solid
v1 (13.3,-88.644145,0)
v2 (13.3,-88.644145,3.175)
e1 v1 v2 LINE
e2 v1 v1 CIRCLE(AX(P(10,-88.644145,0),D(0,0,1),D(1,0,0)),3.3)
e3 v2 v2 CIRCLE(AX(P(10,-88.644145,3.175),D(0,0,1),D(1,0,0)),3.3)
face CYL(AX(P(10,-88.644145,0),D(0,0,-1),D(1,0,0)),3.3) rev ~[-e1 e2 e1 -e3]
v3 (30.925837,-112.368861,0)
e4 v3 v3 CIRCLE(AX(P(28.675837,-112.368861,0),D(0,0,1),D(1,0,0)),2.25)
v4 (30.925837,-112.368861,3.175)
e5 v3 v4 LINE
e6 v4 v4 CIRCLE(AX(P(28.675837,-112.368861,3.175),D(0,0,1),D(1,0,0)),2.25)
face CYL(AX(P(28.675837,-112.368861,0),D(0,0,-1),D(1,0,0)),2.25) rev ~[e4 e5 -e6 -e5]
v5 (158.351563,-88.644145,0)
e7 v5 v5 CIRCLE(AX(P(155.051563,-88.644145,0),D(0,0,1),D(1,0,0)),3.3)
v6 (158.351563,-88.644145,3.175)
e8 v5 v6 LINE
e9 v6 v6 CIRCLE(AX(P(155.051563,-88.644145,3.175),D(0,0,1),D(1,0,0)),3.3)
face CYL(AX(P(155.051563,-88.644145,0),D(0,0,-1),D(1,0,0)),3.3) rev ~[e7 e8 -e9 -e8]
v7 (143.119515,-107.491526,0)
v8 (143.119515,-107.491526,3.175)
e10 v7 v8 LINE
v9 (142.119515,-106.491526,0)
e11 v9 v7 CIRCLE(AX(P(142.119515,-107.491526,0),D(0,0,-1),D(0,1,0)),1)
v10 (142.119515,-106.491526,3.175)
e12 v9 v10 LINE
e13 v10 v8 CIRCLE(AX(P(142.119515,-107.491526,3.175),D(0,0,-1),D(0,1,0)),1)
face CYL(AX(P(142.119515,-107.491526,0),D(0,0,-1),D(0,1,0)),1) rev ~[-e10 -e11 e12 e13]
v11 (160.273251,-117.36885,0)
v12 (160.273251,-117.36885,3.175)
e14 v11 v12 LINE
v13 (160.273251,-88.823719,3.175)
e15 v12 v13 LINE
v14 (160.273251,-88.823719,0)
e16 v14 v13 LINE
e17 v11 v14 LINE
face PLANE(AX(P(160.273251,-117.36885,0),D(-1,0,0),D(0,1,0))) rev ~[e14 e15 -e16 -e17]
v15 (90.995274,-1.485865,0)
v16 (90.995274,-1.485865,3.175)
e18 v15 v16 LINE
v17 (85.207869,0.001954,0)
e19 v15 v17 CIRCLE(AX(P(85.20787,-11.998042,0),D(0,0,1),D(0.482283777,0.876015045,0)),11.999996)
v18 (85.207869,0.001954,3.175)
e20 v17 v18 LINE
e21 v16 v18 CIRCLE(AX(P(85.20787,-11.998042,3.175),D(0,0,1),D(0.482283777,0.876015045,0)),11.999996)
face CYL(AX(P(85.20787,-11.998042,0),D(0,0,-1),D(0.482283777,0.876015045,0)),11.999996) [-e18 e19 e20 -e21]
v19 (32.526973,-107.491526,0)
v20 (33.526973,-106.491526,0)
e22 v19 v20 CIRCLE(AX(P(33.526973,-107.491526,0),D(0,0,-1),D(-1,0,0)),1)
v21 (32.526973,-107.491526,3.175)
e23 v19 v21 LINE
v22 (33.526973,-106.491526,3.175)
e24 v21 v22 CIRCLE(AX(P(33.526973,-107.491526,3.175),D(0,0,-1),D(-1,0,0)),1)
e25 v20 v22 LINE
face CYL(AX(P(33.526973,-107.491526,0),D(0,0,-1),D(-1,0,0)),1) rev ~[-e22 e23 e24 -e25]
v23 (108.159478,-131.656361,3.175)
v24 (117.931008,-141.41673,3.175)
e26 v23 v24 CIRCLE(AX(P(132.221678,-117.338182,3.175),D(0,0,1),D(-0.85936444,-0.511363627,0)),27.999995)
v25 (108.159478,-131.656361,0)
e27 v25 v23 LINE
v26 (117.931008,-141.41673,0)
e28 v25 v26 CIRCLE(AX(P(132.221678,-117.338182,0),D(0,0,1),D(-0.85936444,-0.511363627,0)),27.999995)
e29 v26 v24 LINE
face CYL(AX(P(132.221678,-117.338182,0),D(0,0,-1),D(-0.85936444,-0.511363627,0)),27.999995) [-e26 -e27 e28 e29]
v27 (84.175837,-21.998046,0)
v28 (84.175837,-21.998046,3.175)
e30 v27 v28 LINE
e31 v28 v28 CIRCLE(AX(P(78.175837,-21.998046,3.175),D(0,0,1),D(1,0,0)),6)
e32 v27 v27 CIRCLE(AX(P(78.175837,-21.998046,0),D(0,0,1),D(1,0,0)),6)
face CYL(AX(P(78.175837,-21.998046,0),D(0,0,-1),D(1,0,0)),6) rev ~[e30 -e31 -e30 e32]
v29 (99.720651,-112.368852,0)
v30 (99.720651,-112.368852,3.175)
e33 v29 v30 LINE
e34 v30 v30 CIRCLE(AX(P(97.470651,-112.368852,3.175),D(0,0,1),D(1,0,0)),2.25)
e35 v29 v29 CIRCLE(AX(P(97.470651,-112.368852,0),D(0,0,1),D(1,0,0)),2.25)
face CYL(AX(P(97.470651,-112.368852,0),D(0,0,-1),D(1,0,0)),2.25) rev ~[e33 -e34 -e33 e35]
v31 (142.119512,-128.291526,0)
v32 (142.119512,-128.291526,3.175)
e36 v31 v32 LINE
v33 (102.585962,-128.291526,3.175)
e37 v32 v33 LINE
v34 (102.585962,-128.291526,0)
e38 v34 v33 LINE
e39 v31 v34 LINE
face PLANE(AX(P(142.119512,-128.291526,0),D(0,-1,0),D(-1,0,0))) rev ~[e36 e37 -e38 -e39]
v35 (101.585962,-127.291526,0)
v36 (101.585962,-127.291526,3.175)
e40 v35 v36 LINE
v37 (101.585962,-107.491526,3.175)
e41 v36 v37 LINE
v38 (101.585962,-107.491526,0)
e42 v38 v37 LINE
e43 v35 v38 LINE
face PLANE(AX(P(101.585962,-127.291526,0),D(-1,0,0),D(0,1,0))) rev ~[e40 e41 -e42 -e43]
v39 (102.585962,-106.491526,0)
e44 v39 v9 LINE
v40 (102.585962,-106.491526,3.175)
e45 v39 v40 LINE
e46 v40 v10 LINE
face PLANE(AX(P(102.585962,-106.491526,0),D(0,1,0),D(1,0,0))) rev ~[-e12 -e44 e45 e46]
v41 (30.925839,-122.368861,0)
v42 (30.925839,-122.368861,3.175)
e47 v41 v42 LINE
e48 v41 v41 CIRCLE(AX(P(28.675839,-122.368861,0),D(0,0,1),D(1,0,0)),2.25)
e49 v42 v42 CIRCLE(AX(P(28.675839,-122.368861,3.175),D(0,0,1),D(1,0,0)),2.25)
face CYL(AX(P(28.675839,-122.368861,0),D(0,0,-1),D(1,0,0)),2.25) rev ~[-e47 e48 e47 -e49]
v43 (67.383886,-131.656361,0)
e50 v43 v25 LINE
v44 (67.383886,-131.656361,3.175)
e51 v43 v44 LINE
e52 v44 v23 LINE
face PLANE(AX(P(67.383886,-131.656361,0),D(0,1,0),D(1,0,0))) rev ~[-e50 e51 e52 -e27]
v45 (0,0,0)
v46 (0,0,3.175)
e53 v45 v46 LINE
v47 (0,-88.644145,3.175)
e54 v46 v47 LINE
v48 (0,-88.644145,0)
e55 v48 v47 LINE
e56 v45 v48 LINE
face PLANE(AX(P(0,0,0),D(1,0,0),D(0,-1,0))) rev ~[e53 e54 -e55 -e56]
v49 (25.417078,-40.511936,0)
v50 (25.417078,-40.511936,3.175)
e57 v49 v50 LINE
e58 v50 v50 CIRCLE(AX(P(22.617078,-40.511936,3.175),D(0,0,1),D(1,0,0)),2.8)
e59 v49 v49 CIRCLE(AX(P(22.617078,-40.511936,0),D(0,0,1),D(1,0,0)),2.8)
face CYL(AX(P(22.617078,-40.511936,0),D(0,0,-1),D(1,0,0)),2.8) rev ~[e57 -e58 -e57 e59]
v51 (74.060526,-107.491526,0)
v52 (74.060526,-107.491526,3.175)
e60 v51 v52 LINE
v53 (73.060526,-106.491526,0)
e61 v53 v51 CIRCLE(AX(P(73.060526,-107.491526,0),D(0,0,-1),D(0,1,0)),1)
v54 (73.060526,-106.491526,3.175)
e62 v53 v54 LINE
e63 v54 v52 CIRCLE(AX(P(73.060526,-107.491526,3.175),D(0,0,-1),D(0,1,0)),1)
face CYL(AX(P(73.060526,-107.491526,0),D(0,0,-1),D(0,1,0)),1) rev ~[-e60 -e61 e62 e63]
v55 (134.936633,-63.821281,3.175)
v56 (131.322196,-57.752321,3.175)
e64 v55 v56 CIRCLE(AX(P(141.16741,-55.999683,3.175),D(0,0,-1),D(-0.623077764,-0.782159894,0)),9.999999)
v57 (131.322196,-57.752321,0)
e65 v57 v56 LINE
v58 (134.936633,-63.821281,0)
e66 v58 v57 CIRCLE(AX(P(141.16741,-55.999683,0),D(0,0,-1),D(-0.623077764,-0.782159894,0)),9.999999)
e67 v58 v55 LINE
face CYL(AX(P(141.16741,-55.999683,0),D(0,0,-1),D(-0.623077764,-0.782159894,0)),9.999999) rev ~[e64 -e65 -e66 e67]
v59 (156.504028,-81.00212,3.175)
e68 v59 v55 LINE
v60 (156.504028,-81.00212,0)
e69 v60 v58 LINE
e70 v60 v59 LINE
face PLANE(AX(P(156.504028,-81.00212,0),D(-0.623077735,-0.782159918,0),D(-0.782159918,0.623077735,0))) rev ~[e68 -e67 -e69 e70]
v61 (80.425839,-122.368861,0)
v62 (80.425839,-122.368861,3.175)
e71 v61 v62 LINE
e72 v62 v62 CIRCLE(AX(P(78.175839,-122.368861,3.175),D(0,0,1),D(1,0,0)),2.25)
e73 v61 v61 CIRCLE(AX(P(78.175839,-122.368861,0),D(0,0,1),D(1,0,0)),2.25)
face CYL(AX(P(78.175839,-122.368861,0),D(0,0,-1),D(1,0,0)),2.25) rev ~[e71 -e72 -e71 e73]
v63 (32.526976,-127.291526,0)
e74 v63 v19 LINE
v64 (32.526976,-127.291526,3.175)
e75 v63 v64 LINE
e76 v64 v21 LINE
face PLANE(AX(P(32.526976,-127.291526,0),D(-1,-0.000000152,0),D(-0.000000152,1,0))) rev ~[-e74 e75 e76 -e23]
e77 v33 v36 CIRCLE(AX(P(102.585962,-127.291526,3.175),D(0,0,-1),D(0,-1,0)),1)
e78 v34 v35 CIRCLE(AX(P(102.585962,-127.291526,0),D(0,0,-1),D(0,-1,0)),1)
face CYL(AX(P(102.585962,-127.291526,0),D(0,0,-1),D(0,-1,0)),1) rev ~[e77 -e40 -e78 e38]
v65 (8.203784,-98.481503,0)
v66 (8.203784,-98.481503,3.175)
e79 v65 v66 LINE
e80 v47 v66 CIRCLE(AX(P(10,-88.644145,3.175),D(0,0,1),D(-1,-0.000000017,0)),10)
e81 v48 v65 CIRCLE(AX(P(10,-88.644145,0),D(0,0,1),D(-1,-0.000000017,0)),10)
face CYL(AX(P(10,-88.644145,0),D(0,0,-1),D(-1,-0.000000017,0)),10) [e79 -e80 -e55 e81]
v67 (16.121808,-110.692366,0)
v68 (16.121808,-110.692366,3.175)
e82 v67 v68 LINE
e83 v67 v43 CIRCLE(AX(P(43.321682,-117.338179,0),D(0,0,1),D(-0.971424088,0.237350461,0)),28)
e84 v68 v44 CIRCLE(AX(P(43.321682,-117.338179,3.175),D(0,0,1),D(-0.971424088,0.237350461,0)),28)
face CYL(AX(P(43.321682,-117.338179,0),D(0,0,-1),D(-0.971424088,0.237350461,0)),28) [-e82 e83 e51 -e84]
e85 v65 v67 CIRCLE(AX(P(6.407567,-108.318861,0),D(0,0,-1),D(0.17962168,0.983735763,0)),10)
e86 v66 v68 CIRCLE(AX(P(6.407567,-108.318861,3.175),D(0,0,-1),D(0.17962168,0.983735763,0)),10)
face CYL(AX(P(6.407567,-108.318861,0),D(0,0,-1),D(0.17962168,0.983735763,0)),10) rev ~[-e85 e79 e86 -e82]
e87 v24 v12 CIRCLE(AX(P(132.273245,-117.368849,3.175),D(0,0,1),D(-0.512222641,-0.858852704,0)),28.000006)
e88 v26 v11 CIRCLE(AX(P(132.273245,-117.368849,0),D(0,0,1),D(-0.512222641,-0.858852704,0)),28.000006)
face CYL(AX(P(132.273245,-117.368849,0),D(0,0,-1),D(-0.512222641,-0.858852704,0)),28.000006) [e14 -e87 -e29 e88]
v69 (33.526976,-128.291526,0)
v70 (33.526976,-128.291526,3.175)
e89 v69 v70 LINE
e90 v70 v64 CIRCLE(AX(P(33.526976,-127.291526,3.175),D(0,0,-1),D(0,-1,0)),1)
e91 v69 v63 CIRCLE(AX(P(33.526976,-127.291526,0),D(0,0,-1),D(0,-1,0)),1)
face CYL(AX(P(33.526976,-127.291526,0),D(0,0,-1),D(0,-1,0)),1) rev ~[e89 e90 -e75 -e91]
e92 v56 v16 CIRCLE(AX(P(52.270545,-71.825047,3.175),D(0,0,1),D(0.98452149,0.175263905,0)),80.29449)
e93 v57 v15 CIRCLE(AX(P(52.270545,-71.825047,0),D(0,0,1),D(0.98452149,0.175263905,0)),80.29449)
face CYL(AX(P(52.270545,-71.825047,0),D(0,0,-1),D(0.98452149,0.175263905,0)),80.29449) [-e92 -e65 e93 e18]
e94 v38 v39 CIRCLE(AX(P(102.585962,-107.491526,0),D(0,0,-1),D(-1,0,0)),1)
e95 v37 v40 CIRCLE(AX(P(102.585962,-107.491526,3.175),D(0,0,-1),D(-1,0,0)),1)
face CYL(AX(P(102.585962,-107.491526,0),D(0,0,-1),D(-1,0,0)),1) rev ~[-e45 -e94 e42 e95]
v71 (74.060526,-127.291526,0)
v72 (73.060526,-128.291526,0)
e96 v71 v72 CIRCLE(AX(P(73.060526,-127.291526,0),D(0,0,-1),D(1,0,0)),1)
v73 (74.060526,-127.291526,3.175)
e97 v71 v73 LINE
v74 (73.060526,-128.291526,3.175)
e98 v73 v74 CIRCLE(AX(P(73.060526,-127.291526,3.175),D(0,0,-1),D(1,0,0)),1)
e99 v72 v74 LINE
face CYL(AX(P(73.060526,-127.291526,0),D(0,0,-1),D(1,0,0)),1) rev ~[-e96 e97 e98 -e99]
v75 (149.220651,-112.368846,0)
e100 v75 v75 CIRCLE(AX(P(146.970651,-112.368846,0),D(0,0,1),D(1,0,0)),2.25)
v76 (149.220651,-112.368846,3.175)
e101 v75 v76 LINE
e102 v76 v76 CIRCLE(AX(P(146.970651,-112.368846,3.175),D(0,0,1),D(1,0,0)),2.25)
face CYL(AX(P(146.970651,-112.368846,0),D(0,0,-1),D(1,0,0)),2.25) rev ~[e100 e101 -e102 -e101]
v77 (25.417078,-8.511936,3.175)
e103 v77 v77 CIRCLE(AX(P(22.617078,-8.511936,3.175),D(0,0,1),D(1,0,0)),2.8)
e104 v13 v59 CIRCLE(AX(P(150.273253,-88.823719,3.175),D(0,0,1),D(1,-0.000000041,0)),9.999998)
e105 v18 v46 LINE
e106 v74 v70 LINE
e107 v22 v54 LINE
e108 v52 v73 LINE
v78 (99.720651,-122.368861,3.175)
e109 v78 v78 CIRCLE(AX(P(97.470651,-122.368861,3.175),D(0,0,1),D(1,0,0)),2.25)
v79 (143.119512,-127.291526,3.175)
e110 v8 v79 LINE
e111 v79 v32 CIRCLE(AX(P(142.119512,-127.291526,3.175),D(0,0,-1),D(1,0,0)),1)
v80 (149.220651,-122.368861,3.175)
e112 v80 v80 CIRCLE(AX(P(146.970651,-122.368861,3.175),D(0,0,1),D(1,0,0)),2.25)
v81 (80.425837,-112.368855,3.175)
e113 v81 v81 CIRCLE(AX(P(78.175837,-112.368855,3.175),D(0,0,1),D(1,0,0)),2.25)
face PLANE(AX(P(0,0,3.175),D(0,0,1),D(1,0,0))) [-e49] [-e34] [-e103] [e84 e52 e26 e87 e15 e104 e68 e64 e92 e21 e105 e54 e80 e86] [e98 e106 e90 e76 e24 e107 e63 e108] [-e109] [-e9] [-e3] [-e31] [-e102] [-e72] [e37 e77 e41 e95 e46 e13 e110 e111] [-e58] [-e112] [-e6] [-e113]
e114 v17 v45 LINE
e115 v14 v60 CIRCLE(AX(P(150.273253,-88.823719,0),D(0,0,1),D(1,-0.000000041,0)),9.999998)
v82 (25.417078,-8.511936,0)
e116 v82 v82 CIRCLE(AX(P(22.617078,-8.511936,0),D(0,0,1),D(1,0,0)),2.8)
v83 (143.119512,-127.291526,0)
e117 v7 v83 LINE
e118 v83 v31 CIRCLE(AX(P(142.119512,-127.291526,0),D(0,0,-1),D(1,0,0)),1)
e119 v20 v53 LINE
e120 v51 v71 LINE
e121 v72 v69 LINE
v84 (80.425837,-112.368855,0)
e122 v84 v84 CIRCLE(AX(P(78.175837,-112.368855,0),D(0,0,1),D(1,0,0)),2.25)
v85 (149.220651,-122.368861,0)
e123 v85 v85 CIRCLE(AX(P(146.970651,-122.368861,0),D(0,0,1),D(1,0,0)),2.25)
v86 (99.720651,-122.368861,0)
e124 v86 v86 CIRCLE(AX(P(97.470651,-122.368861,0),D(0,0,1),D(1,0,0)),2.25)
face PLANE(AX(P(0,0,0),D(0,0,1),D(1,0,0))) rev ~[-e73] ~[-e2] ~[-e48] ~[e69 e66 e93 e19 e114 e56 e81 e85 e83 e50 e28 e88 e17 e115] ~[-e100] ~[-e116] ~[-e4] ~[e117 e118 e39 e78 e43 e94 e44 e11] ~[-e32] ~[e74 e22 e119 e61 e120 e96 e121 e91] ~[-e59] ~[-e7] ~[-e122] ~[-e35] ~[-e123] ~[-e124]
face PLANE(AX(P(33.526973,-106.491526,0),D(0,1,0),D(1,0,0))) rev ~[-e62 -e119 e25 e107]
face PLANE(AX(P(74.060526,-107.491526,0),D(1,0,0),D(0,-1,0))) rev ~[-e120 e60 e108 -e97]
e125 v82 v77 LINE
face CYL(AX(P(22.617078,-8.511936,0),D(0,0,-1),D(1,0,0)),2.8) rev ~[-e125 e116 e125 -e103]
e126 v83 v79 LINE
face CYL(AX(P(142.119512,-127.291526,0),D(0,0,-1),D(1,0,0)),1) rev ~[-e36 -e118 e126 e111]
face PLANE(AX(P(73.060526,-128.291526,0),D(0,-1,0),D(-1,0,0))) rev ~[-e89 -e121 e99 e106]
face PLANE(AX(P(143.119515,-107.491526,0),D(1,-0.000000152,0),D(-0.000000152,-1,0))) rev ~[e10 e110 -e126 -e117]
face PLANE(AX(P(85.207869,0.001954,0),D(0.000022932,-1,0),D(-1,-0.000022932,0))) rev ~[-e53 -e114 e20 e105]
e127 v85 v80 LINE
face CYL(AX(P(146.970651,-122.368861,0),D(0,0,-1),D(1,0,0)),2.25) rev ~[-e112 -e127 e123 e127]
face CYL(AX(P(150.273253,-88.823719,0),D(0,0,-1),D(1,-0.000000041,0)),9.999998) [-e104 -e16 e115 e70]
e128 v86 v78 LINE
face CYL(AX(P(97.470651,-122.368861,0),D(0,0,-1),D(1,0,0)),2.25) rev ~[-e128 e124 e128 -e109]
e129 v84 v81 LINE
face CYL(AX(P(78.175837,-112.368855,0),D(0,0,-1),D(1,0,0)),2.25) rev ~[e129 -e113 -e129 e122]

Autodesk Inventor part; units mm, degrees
ref_plane "YZ Plane" through (0, 0, 0) normal (1, 0, 0) x (0, 1, 0)
ref_plane "XZ Plane" through (0, 0, 0) normal (0, 1, 0) x (-1, 0, 0)
ref_plane "XY Plane" through (0, 0, 0) normal (0, 0, 1) x (1, 0, 0)
sketch "Sketch1" plane through (0, 0, 0) normal (0, 0, 1) x (1, 0, 0)
  arc A0 (16.121808, -110.692366) -> (67.383886, -131.656361) centre (43.321682, -117.338179) ccw
  line L0 (67.383886, -131.656361) -> (108.159478, -131.656361)
  arc A1 (108.159478, -131.656361) -> (139.594615, -90.326332) centre (132.221682, -117.338179) ccw
  arc A2 (132.227805, -80.679244) -> (139.594615, -90.326332) centre (142.227805, -80.679244) ccw
  line L1 (132.227805, -80.679244) -> (132.227805, -71.827)
  arc A3 (132.227805, -71.827) -> (90.658044, -1.487819) centre (51.933317, -71.827) ccw
  arc A4 (90.658044, -1.487819) -> (84.870639, 0) centre (84.870639, -12) ccw
  line L2 (84.870639, 0) -> (0, 0)
  line L3 (0, 0) -> (0, -88.644145)
  arc A5 (0, -88.644145) -> (8.203784, -98.481503) centre (10, -88.644145) ccw
  arc A6 (16.121808, -110.692366) -> (8.203784, -98.481503) centre (6.407567, -108.318861) ccw
  circle A7 centre (121.188208, -82.443861) radius 3.3
  arc A8 (145.794404, -114.286904) -> (148.095336, -110.420107) centre (146.970651, -112.368846) ccw
  circle A9 centre (97.470651, -122.368861) radius 2.25
  circle A10 centre (97.470651, -112.368852) radius 2.25
  circle A11 centre (78.175839, -122.368861) radius 2.25
  arc A12 (145.794404, -124.286918) -> (148.095336, -120.420122) centre (146.970651, -122.368861) ccw
  circle A13 centre (22.617078, -8.511936) radius 2.8
  circle A14 centre (22.617078, -40.511936) radius 2.8
  circle A15 centre (28.675839, -122.368861) radius 2.25
  circle A16 centre (28.675837, -112.368861) radius 2.25
  circle A17 centre (78.175837, -112.368855) radius 2.25
  circle A18 centre (10, -88.644145) radius 3.3
  line L4 (73.060526, -128.291526) -> (33.526976, -128.291526)
  arc A19 (32.526976, -127.291526) -> (33.526976, -128.291526) centre (33.526976, -127.291526) ccw
  line L5 (32.526976, -127.291526) -> (32.526973, -107.491526)
  arc A20 (33.526973, -106.491526) -> (32.526973, -107.491526) centre (33.526973, -107.491526) ccw
  line L6 (33.526973, -106.491526) -> (73.060526, -106.491526)
  arc A21 (74.060526, -107.491526) -> (73.060526, -106.491526) centre (73.060526, -107.491526) ccw
  line L7 (74.060526, -107.491526) -> (74.060526, -127.291526)
  arc A22 (73.060526, -128.291526) -> (74.060526, -127.291526) centre (73.060526, -127.291526) ccw
  line L8 (142.119512, -128.291526) -> (102.585962, -128.291526)
  arc A23 (101.585962, -127.291526) -> (102.585962, -128.291526) centre (102.585962, -127.291526) ccw
  line L9 (101.585962, -127.291526) -> (101.585962, -107.491526)
  arc A24 (102.585962, -106.491526) -> (101.585962, -107.491526) centre (102.585962, -107.491526) ccw
  line L10 (102.585962, -106.491526) -> (142.119515, -106.491526)
  arc A25 (143.119515, -107.491526) -> (142.119515, -106.491526) centre (142.119515, -107.491526) ccw
  line L11 (143.119515, -107.491526) -> (143.119512, -127.291526)
  arc A26 (142.119512, -128.291526) -> (143.119512, -127.291526) centre (142.119512, -127.291526) ccw
  circle A27 centre (146.970651, -112.368846) radius 2.25
  circle A28 centre (146.970651, -122.368861) radius 2.25
  line L12 (28.675837, -112.368861) -> (146.970651, -112.368846) construction
  line L13 (28.675839, -122.368861) -> (146.970651, -122.368861) construction
  circle A29 centre (43.373245, -117.368861) radius 6
  line L14 (67.43545, -131.687043) -> (108.211041, -131.687043)
  arc A30 (108.211041, -131.687043) -> (160.273251, -117.36885) centre (132.273245, -117.36885) ccw
  line L15 (160.273251, -117.36885) -> (160.273251, -88.823719)
  arc A31 (160.273251, -88.823719) -> (156.504028, -81.00212) centre (150.273251, -88.823719) ccw
  line L16 (156.504028, -81.00212) -> (134.936633, -63.821281)
  arc A32 (131.322196, -57.752321) -> (134.936633, -63.821281) centre (141.167411, -55.999682) ccw
  arc A33 (131.322196, -57.752321) -> (90.995274, -1.485865) centre (52.270547, -71.825046) ccw
  arc A34 (90.995274, -1.485865) -> (85.207869, 0.001954) centre (85.207869, -11.998046) ccw
  line L17 (85.207869, 0.001954) -> (0.051563, 0.001954)
  line L18 (0.051563, 0.001954) -> (0.051563, -88.674827)
  arc A35 (0.051563, -88.674827) -> (8.255347, -98.512185) centre (10.051563, -88.674827) ccw
  arc A36 (16.173371, -110.723048) -> (8.255347, -98.512185) centre (6.45913, -108.349543) ccw
  arc A37 (16.173371, -110.723048) -> (67.43545, -131.687043) centre (43.373245, -117.368861) ccw
  circle A38 centre (22.617078, -40.511936) radius 2.8
  circle A39 centre (22.617078, -8.511936) radius 2.8
  circle A40 centre (155.051563, -88.644145) radius 3.3
  circle A41 centre (10.051563, -88.644145) radius 3.3
  circle A42 centre (132.273245, -117.36885) radius 6
  circle A43 centre (78.175837, -21.998046) radius 3.25
  circle A44 centre (78.175837, -21.998046) radius 6
  point P0 (58.854578, -117.368861)
  point P1 (148.095336, -110.420107)
  point P2 (117.931008, -141.41673)
  point P3 (0.051563, 0)
  dimension "d2" = 49.5
  dimension "d3" = 49.5
  dimension "d4" = 49.5
  dimension "d5" = 49.5
  dimension "d6" = 10
  dimension "d7" = 12
  dimension "d8" = 22
sketch "Sketch1 outline for Extrusion1" plane through (0, 0, 0) normal (0, 0, 1) x (1, 0, 0)
  line L0 (85.207869, 0.001954) -> (0, 0)
  line L1 (0, 0) -> (0, -88.644145)
  arc A0 (0, -88.644145) -> (8.203784, -98.481503) centre (10, -88.644145) ccw
  arc A1 (8.203784, -98.481503) -> (16.121808, -110.692366) centre (6.407567, -108.318861) cw
  arc A2 (16.121808, -110.692366) -> (67.383886, -131.656361) centre (43.321682, -117.338179) ccw
  line L2 (67.383886, -131.656361) -> (108.159478, -131.656361)
  arc A3 (108.159478, -131.656361) -> (117.931008, -141.41673) centre (132.221682, -117.338179) ccw
  arc A4 (117.931008, -141.41673) -> (160.273251, -117.36885) centre (132.273245, -117.36885) ccw
  line L3 (160.273251, -117.36885) -> (160.273251, -88.823719)
  arc A5 (160.273251, -88.823719) -> (156.504028, -81.00212) centre (150.273251, -88.823719) ccw
  line L4 (156.504028, -81.00212) -> (134.936633, -63.821281)
  arc A6 (134.936633, -63.821281) -> (131.322196, -57.752321) centre (141.167411, -55.999682) cw
  arc A7 (131.322196, -57.752321) -> (90.995274, -1.485865) centre (52.270547, -71.825046) ccw
  arc A8 (90.995274, -1.485865) -> (85.207869, 0.001954) centre (85.207869, -11.998046) ccw
  circle A9 centre (155.051563, -88.644145) radius 3.3
  circle A10 centre (78.175837, -21.998046) radius 6
  circle A11 centre (22.617078, -8.511936) radius 2.8
  circle A12 centre (22.617078, -40.511936) radius 2.8
  circle A13 centre (146.970651, -112.368846) radius 2.25
  circle A14 centre (28.675839, -122.368861) radius 2.25
  circle A15 centre (28.675837, -112.368861) radius 2.25
  line L5 (74.060526, -107.491526) -> (74.060526, -127.291526)
  arc A16 (74.060526, -127.291526) -> (73.060526, -128.291526) centre (73.060526, -127.291526) cw
  line L6 (73.060526, -128.291526) -> (33.526976, -128.291526)
  arc A17 (33.526976, -128.291526) -> (32.526976, -127.291526) centre (33.526976, -127.291526) cw
  line L7 (32.526976, -127.291526) -> (32.526973, -107.491526)
  arc A18 (32.526973, -107.491526) -> (33.526973, -106.491526) centre (33.526973, -107.491526) cw
  line L8 (33.526973, -106.491526) -> (73.060526, -106.491526)
  arc A19 (73.060526, -106.491526) -> (74.060526, -107.491526) centre (73.060526, -107.491526) cw
  circle A20 centre (10, -88.644145) radius 3.3
  circle A21 centre (78.175839, -122.368861) radius 2.25
  circle A22 centre (97.470651, -122.368861) radius 2.25
  circle A23 centre (78.175837, -112.368855) radius 2.25
  circle A24 centre (97.470651, -112.368852) radius 2.25
  line L9 (102.585962, -106.491526) -> (142.119515, -106.491526)
  arc A25 (142.119515, -106.491526) -> (143.119515, -107.491526) centre (142.119515, -107.491526) cw
  line L10 (143.119515, -107.491526) -> (143.119512, -127.291526)
  arc A26 (143.119512, -127.291526) -> (142.119512, -128.291526) centre (142.119512, -127.291526) cw
  line L11 (142.119512, -128.291526) -> (102.585962, -128.291526)
  arc A27 (102.585962, -128.291526) -> (101.585962, -127.291526) centre (102.585962, -127.291526) cw
  line L12 (101.585962, -127.291526) -> (101.585962, -107.491526)
  arc A28 (101.585962, -107.491526) -> (102.585962, -106.491526) centre (102.585962, -107.491526) cw
  circle A29 centre (146.970651, -122.368861) radius 2.25
extrude "Extrusion1" add sketch "Sketch1 outline for Extrusion1" along normal blind 3.175
properties part number "Intake Sides V4_servo" material "Polycarbonate, Clear"
